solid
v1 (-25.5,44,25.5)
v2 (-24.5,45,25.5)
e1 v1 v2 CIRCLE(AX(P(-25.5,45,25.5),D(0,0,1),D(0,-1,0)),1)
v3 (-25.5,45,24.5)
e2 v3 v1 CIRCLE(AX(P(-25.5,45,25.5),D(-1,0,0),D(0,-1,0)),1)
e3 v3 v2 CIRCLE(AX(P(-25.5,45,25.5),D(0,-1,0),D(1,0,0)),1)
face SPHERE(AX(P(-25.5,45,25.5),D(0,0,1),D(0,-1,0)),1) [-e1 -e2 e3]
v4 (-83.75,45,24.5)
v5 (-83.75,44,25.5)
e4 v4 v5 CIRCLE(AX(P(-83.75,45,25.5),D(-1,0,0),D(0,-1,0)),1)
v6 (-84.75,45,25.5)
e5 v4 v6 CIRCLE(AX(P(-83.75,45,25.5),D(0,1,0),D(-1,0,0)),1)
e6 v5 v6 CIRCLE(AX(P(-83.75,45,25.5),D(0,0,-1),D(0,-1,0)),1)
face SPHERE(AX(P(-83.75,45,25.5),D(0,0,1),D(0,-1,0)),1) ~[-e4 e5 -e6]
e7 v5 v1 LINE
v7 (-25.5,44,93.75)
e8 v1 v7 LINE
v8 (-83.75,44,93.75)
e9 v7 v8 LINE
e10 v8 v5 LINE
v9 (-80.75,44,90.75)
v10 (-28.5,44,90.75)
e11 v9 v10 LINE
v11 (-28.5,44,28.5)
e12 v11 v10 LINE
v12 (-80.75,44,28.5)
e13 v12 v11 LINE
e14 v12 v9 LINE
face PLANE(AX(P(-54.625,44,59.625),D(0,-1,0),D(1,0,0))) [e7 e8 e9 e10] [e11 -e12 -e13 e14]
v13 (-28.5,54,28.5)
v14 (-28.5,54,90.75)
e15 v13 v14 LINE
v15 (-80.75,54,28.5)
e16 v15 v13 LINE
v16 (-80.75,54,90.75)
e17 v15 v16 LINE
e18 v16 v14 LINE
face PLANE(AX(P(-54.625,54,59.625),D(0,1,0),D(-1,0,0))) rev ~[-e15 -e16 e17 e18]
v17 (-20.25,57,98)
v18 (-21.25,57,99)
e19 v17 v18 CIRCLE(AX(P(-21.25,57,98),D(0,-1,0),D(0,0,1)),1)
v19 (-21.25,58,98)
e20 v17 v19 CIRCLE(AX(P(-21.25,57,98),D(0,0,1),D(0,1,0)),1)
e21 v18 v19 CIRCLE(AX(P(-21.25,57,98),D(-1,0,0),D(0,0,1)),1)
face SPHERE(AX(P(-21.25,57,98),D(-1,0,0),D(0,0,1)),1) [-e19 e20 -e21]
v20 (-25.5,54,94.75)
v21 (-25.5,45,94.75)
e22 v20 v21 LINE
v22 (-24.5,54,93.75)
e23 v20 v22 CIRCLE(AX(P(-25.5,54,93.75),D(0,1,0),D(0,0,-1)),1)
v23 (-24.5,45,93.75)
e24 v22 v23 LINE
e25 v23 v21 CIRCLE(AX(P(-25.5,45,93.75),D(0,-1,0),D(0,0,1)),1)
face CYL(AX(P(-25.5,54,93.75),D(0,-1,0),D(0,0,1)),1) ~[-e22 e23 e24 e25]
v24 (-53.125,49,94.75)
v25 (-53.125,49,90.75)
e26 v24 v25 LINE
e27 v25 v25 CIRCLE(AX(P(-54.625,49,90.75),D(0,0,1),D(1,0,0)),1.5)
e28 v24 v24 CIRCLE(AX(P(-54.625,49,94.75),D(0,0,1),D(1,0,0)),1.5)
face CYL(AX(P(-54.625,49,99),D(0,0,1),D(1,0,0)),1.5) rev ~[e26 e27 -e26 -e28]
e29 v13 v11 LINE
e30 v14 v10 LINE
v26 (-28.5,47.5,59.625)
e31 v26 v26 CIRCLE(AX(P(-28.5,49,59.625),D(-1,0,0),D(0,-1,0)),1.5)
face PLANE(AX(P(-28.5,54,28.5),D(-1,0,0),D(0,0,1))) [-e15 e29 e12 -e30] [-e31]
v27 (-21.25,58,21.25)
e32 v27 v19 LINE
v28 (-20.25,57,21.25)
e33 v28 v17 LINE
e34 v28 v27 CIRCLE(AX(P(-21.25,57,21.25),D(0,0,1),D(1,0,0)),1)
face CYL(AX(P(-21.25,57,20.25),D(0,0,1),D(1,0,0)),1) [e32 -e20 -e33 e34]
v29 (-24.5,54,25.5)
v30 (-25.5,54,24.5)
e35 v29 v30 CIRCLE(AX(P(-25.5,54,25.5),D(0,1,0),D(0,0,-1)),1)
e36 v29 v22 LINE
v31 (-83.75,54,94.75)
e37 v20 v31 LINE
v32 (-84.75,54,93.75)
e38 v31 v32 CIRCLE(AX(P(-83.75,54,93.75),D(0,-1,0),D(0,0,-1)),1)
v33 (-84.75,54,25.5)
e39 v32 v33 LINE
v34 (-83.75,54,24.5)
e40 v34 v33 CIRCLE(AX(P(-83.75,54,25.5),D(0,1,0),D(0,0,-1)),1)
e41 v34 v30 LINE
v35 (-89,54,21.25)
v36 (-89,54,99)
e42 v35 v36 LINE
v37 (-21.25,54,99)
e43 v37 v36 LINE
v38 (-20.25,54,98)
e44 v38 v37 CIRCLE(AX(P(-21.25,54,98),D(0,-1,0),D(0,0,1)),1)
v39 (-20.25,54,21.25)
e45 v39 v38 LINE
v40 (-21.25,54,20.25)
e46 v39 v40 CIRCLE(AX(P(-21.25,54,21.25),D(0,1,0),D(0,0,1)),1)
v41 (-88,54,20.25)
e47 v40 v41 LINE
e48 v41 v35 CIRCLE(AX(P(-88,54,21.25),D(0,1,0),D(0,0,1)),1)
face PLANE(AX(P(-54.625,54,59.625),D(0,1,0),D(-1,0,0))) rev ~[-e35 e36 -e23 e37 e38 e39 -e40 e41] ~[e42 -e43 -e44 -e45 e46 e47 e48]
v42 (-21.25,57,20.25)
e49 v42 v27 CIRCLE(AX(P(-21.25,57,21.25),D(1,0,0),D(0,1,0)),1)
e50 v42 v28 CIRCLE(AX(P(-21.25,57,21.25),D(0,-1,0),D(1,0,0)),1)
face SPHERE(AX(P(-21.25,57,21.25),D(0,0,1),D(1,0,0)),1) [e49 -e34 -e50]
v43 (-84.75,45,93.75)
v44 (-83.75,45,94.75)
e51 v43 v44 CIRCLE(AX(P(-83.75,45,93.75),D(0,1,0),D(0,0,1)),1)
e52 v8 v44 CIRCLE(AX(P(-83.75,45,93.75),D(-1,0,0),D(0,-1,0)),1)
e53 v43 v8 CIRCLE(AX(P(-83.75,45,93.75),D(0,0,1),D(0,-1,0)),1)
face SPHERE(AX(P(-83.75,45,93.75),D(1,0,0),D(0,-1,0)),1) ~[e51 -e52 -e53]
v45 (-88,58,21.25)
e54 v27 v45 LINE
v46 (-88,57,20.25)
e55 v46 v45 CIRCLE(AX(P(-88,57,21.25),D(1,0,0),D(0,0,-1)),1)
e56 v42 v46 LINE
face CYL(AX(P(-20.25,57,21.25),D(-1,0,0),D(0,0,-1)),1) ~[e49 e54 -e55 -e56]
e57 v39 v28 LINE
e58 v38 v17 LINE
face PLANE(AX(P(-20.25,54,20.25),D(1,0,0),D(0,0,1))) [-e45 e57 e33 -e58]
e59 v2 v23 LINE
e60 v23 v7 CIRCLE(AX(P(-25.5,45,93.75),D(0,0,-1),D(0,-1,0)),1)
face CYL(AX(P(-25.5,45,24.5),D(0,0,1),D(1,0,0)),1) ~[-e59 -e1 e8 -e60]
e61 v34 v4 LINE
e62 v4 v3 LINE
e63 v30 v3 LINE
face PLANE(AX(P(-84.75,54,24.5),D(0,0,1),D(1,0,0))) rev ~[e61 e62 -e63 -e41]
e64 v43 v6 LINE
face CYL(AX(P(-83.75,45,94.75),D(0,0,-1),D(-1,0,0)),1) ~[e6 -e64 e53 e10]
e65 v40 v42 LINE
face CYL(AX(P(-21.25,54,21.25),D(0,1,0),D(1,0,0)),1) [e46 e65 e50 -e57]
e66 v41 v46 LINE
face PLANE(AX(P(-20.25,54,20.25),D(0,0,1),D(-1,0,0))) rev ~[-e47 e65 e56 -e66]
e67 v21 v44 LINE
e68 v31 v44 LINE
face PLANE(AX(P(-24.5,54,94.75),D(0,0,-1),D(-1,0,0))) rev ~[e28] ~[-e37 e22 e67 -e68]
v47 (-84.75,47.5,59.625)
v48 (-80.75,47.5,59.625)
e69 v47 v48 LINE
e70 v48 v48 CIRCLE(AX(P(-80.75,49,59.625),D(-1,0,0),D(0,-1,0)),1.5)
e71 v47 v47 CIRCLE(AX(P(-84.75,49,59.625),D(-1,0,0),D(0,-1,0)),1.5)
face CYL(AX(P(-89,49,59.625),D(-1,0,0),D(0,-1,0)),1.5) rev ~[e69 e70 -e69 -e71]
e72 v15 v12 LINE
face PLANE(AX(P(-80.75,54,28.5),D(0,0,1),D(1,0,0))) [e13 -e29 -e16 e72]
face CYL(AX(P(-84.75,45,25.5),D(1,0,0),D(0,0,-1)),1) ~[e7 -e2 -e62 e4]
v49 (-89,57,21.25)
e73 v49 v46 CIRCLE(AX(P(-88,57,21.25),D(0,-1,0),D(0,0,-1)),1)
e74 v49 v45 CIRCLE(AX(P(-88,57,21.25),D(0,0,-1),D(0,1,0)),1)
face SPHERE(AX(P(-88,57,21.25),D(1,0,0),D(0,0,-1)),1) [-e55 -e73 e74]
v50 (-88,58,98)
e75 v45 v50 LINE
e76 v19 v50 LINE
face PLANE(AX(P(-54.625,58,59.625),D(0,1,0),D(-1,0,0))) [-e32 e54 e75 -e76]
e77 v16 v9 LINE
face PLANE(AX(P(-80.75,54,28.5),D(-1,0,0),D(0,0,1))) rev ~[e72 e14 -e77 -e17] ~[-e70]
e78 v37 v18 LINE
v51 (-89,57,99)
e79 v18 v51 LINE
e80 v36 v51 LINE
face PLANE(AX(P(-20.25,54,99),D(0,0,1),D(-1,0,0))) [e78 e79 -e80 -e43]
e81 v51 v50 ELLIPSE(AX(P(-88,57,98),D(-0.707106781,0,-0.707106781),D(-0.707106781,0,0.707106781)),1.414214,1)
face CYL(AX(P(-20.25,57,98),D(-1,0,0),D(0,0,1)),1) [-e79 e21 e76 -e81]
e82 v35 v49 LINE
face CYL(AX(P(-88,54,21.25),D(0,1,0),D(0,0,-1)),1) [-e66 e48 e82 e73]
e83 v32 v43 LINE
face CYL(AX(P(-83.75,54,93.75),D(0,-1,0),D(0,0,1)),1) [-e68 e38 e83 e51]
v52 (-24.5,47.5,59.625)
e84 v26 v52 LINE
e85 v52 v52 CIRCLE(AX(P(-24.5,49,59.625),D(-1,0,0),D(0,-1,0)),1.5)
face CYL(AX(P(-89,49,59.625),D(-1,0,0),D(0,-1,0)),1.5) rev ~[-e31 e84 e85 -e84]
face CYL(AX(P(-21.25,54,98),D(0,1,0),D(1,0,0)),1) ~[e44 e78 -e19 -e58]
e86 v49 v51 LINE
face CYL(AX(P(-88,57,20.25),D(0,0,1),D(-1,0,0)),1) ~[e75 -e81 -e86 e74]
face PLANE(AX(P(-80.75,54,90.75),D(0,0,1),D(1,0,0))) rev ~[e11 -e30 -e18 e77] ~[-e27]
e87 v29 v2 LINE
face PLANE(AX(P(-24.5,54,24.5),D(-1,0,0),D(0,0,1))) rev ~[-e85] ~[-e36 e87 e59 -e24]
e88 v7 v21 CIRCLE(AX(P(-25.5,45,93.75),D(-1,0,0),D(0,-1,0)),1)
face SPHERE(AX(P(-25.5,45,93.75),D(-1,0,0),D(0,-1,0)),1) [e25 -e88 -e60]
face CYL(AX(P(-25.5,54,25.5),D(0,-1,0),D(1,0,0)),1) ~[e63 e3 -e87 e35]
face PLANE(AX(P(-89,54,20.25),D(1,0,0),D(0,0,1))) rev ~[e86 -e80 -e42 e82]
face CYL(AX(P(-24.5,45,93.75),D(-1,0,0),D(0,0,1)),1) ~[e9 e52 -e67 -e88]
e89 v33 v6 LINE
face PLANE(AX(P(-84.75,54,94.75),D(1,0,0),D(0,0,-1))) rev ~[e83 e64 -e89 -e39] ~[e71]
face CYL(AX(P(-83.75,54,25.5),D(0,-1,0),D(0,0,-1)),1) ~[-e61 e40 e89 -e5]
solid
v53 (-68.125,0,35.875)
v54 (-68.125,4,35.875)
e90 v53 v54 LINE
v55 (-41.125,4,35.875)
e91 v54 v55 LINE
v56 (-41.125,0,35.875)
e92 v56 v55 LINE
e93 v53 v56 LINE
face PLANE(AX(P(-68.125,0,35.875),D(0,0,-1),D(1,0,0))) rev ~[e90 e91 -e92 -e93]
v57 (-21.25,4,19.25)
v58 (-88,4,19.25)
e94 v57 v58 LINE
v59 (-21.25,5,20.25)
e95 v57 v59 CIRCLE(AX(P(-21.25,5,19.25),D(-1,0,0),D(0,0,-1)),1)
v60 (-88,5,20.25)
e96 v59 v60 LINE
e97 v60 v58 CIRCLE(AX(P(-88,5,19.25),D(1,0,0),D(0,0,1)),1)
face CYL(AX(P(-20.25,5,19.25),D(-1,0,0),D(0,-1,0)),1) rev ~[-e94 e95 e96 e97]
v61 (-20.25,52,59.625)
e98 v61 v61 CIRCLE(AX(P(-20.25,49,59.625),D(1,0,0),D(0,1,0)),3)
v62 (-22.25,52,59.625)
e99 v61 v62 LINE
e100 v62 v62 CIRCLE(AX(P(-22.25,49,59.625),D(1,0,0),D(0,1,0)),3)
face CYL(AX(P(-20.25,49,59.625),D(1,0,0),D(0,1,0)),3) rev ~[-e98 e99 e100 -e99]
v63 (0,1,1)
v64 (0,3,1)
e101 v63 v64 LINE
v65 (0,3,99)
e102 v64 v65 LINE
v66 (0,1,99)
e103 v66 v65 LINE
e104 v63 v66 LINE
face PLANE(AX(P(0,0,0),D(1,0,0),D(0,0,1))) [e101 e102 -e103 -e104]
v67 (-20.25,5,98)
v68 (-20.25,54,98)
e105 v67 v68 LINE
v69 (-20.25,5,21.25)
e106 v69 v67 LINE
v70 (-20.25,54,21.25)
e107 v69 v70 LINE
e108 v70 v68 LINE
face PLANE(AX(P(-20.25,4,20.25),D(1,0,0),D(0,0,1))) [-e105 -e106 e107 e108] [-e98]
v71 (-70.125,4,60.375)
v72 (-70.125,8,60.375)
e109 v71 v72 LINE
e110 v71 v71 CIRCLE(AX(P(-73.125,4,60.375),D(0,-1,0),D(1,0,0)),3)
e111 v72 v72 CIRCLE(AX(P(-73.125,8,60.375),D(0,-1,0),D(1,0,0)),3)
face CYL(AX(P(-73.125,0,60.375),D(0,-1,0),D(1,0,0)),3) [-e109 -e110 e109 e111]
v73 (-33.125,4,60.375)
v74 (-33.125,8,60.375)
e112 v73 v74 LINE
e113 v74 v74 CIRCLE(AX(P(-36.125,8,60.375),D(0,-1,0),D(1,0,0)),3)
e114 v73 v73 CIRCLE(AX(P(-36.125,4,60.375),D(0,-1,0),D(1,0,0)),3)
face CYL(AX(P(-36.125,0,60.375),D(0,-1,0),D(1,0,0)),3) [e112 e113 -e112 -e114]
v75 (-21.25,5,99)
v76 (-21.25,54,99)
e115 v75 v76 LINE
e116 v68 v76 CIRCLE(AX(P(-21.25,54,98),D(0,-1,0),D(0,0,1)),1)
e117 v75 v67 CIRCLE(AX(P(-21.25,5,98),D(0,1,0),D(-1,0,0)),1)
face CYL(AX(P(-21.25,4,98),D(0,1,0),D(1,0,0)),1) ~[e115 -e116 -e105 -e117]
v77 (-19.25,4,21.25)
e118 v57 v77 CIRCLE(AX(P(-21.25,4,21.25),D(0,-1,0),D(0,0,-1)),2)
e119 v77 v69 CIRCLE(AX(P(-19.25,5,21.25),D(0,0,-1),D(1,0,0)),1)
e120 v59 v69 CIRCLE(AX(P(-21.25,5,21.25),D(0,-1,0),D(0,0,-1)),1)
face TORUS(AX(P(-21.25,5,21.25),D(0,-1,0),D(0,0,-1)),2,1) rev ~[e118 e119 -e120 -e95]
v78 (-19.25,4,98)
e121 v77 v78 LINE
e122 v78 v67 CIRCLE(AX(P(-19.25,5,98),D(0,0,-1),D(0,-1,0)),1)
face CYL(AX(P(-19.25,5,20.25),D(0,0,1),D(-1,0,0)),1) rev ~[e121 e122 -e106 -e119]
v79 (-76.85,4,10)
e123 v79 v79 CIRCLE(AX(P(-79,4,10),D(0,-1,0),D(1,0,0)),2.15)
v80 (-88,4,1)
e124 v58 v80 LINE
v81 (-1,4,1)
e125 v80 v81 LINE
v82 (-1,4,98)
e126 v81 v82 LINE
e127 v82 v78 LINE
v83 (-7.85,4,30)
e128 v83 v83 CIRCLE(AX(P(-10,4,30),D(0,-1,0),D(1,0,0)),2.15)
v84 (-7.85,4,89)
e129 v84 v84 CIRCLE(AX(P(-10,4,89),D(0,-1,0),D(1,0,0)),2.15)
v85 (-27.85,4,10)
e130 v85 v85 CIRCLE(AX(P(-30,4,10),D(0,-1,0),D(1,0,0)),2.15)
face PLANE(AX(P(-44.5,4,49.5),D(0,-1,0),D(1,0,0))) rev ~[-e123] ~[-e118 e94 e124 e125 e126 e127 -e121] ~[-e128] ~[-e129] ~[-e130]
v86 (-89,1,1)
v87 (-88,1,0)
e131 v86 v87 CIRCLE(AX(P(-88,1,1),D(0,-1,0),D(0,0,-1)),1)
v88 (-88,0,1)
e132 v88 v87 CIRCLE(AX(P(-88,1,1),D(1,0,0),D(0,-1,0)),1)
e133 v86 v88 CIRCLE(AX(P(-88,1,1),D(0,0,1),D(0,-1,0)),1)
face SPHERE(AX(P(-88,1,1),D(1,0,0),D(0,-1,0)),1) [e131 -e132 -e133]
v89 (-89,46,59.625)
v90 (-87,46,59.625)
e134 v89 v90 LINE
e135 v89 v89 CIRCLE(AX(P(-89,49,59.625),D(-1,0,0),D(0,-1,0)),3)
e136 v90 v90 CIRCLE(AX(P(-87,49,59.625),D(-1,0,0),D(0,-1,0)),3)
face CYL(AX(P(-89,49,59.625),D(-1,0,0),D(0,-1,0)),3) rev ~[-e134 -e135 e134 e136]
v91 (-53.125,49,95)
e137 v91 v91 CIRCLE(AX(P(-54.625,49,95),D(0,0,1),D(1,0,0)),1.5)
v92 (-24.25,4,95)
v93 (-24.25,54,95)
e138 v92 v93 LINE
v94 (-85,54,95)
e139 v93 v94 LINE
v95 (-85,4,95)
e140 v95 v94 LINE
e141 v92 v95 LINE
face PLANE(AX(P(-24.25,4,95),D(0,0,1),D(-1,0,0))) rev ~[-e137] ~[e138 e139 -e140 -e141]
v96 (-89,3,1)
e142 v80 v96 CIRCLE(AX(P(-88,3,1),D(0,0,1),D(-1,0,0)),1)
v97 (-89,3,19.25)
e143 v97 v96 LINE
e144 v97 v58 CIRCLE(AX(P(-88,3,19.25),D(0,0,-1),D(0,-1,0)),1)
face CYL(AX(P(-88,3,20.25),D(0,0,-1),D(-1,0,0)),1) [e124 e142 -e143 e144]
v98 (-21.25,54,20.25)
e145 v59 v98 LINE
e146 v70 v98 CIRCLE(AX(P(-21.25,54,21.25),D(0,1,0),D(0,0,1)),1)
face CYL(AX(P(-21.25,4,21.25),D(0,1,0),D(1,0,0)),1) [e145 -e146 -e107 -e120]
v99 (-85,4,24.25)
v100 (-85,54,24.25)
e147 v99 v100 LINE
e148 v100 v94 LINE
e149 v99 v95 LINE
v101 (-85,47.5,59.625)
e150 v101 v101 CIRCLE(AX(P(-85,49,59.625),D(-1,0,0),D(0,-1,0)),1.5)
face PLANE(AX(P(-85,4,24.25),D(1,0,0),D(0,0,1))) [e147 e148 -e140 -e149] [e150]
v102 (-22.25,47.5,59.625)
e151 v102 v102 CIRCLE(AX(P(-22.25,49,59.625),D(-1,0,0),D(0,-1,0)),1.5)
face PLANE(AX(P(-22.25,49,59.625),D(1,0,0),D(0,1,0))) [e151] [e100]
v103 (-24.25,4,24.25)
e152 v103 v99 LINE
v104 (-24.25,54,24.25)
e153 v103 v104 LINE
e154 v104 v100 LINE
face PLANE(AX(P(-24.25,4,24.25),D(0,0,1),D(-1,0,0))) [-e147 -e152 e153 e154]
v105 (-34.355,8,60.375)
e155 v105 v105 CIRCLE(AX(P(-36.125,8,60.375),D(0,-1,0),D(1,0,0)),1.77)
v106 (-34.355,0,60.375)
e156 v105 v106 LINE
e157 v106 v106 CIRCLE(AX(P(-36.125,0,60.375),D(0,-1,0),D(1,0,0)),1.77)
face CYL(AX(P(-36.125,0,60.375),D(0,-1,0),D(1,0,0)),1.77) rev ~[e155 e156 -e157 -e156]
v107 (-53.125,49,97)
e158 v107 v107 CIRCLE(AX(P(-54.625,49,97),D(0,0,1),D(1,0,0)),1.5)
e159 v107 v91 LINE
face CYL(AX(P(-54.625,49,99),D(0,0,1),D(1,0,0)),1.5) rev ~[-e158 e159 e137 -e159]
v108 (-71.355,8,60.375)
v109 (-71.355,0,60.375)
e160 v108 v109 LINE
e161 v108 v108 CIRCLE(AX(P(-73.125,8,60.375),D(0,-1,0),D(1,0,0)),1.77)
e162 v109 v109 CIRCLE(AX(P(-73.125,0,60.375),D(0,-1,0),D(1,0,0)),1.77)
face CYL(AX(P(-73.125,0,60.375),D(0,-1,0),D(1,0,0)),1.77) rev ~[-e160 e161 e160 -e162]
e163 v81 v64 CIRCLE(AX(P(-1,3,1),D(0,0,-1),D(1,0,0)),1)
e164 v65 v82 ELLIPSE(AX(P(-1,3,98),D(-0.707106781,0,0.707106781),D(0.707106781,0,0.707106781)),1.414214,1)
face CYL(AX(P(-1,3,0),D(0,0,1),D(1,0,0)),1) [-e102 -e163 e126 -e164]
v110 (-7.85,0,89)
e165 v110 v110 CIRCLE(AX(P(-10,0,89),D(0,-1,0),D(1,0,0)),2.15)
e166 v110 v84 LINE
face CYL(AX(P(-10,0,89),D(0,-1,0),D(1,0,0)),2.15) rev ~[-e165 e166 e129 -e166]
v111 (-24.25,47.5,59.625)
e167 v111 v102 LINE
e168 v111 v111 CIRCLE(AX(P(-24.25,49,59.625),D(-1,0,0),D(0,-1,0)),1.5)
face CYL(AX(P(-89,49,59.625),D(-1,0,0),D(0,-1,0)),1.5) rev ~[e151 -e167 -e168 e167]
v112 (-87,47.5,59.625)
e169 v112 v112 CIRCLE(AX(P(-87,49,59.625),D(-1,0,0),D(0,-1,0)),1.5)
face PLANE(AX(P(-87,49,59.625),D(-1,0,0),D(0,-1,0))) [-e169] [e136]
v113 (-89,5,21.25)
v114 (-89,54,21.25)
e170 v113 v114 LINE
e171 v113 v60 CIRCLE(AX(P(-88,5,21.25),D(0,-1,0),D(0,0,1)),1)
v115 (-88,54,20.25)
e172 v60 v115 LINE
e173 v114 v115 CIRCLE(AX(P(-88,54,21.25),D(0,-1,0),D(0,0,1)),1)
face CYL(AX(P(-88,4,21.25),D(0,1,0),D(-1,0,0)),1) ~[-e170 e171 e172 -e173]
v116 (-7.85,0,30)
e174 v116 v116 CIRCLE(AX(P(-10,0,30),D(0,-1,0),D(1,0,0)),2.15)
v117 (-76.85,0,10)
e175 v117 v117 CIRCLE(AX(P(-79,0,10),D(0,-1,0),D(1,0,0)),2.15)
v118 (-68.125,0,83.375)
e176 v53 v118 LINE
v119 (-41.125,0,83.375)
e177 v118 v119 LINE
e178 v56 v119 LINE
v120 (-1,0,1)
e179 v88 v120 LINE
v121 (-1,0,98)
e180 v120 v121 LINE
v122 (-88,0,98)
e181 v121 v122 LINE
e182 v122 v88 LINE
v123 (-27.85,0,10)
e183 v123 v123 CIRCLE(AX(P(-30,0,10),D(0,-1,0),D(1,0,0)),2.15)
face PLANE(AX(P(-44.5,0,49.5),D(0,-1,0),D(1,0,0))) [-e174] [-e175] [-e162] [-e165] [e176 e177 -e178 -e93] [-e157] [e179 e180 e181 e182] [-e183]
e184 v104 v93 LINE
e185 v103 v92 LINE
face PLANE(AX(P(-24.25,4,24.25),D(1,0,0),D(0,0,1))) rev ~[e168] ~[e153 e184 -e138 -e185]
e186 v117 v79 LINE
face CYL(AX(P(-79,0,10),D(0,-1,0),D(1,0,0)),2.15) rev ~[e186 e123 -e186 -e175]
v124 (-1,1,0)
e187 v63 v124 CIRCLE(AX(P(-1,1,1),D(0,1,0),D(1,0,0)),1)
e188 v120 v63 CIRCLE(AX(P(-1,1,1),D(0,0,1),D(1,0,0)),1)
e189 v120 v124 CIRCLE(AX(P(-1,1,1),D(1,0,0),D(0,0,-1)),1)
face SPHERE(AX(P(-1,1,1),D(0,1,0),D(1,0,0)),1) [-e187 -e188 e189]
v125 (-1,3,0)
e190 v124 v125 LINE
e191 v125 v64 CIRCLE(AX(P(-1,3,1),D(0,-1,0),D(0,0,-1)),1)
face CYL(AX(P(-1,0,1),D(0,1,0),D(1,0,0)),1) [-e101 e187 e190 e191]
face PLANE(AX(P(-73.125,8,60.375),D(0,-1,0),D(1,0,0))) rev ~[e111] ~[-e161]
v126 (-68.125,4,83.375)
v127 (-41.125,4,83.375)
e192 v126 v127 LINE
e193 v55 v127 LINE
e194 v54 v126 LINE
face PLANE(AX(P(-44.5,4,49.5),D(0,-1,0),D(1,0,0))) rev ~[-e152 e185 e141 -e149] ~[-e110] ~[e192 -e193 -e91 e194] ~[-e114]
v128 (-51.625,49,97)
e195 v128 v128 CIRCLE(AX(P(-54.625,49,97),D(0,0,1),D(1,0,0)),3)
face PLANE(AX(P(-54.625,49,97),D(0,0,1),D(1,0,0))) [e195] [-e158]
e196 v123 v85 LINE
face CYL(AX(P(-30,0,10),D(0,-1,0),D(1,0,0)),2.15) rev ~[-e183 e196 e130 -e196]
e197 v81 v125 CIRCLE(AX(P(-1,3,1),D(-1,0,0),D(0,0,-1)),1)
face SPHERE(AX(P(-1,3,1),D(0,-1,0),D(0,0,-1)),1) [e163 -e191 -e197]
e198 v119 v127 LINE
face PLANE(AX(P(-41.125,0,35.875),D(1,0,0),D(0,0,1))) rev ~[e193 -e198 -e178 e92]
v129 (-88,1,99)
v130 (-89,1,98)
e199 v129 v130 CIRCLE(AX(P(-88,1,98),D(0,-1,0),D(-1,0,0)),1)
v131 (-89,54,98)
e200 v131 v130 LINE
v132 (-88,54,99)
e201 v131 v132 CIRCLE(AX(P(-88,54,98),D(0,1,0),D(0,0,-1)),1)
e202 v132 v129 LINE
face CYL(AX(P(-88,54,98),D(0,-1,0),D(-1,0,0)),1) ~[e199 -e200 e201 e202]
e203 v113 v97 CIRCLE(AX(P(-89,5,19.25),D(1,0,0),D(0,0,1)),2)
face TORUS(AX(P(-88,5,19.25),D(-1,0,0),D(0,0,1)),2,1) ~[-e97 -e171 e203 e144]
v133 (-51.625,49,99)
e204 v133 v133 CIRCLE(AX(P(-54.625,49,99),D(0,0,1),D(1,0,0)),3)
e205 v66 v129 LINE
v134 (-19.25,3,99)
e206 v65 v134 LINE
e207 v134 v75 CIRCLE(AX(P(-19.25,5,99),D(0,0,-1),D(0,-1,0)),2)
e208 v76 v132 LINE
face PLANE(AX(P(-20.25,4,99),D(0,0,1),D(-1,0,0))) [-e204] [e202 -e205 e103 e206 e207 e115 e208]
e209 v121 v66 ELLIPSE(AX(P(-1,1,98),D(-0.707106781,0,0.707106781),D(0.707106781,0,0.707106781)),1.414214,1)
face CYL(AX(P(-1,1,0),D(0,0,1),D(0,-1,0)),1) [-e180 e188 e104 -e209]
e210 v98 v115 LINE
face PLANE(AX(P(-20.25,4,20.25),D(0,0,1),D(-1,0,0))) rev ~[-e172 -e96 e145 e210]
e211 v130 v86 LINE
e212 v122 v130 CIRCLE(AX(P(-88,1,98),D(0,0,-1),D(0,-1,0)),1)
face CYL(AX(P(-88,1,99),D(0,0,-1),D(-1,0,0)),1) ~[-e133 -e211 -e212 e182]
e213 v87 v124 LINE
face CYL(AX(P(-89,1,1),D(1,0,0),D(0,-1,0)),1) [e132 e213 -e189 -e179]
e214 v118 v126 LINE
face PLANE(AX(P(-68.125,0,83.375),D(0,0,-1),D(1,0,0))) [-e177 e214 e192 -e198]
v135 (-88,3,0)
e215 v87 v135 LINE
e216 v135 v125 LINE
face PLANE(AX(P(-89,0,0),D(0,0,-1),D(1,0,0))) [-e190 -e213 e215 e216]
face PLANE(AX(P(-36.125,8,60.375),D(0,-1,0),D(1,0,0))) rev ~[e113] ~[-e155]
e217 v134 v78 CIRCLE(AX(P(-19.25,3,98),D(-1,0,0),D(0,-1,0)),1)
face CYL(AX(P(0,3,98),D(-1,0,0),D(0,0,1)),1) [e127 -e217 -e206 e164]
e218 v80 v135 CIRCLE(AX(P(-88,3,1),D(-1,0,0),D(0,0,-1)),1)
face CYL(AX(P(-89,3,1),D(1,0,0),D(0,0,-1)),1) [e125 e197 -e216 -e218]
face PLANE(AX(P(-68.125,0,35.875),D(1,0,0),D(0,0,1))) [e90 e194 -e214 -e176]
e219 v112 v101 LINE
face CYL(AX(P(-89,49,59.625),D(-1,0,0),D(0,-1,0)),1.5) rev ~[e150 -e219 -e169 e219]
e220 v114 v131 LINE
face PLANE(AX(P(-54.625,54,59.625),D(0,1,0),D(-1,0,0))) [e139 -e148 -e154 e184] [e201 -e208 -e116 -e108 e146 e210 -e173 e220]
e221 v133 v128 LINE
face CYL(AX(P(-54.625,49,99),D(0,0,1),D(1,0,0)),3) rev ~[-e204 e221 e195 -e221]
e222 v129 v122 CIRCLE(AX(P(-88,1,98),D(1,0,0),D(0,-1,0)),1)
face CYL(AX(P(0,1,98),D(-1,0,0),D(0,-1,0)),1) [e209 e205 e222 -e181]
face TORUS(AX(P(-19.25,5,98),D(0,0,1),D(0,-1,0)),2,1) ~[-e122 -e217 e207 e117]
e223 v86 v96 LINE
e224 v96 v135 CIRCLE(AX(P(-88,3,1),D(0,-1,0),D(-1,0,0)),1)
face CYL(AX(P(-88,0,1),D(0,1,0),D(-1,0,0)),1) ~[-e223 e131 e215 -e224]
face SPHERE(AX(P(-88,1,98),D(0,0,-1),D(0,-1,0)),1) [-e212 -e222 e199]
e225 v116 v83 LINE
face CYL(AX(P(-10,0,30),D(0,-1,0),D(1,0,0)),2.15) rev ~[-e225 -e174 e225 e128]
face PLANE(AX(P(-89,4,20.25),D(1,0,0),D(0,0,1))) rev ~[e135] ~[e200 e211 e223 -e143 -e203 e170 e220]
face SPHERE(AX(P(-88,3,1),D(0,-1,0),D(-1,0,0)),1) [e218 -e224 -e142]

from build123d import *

# Parameters (mm, degrees)
F0_R      = 2.15
F0_R_2    = 3
F0_W      = 27
F0_H      = 47.5
F0_R_3    = 1.77
F1_DEPTH  = 4
F2_DEPTH  = 8
F3_W      = 68.75
F3_H      = 78.75
F3_W_2    = 60.75
F3_H_2    = 70.75
F4_DEPTH  = 50
F5_W      = 68.75
F5_H      = 78.75
F6_DEPTH  = 4
F7_W      = 52.25
F7_H      = 62.25
F8_DEPTH  = 10
F9_R      = 1
F10_R     = 1.5
F11_DEPTH = 25
F10_R_2   = 3
F12_DEPTH = 2
F13_R     = 1.5
F14_DEPTH = 89.001
F13_R_2   = 3
F15_DEPTH = 2
F16_R     = 3
F16_R_2   = 1.5
F17_DEPTH = 2
F18_R     = 1
F18_2_R   = 1


with BuildPart() as f1:
    # F0 (on Front) → F1 (new body)
    with BuildSketch(Plane.XZ):
        Polygon((-89, 0), (0, 0), (0, 99), (-20.25, 99), (-89, 99), align=None)
        with Locations((-79, 10)):
            Circle(F0_R, mode=Mode.SUBTRACT)
        with Locations((-30, 10)):
            Circle(F0_R, mode=Mode.SUBTRACT)
        with Locations((-10, 30)):
            Circle(F0_R, mode=Mode.SUBTRACT)
        with Locations((-73.125, 60.375)):
            Circle(F0_R_2, mode=Mode.SUBTRACT)
        with Locations((-54.625, 59.625)):
            Rectangle(F0_W, F0_H, mode=Mode.SUBTRACT)
        with Locations((-36.125, 60.375)):
            Circle(F0_R_2, mode=Mode.SUBTRACT)
        with Locations((-10, 89)):
            Circle(F0_R, mode=Mode.SUBTRACT)
        with Locations((-73.125, 60.375)):
            Circle(F0_R_2)
        with Locations((-73.125, 60.375)):
            Circle(F0_R_3, mode=Mode.SUBTRACT)
        with Locations((-36.125, 60.375)):
            Circle(F0_R_2)
        with Locations((-36.125, 60.375)):
            Circle(F0_R_3, mode=Mode.SUBTRACT)
    extrude(amount=-F1_DEPTH)

    # F0 (on Front) → F2 (join)
    with BuildSketch(Plane.XZ):
        with Locations((-73.125, 60.375)):
            Circle(F0_R_2)
        with Locations((-73.125, 60.375)):
            Circle(F0_R_3, mode=Mode.SUBTRACT)
        with Locations((-36.125, 60.375)):
            Circle(F0_R_2)
        with Locations((-36.125, 60.375)):
            Circle(F0_R_3, mode=Mode.SUBTRACT)
    extrude(amount=-F2_DEPTH)

    # F3 (on face) → F4 (join)
    with BuildSketch(Plane(origin=(0, 4, 0), x_dir=(-1, 0, 0), z_dir=(0, 1, 0))):
        with Locations((54.625, 59.625)):
            Rectangle(F3_W, F3_H)
        with Locations((54.625, 59.625)):
            Rectangle(F3_W_2, F3_H_2, mode=Mode.SUBTRACT)
    extrude(amount=F4_DEPTH)


with BuildPart() as f6:
    # F5 (on face) → F6 (new body)
    with BuildSketch(Plane(origin=(0, 54, 0), x_dir=(-1, 0, 0), z_dir=(0, 1, 0))):
        with Locations((54.625, 59.625)):
            Rectangle(F5_W, F5_H)
    extrude(amount=F6_DEPTH)

    # F7 (on face) → F8 (join)
    with BuildSketch(Plane.XZ.offset(-54)):
        Polygon((-80.75, 94.75), (-84.75, 94.75), (-84.75, 24.5), (-80.75, 24.5), (-28.5, 24.5), (-24.5, 24.5), (-24.5, 94.75), (-28.5, 94.75), align=None)
        with Locations((-54.625, 59.625)):
            Rectangle(F7_W, F7_H, mode=Mode.SUBTRACT)
    extrude(amount=F8_DEPTH)

    # F9
    f9_edges = [f6.edges().sort_by_distance(p)[0] for p in [
        (-54.625, 44, 94.75),
        (-84.75, 44, 59.625),
        (-24.5, 44, 59.625),
        (-54.625, 44, 24.5),
        (-84.75, 49, 94.75),
        (-84.75, 49, 24.5),
        (-24.5, 49, 24.5),
        (-24.5, 49, 94.75),
    ]]
    fillet(f9_edges, radius=F9_R)


with BuildPart() as f11_tool:
    # F10 (on face) → F11 (new body)
    with BuildSketch(Plane.XY.offset(99)):
        with Locations((-54.625, 49)):
            Circle(F10_R)
    extrude(amount=-F11_DEPTH)


with BuildPart() as f1_1:
    add(f1.part)

    # F11: cut by f11_tool
    add(f11_tool.part, mode=Mode.SUBTRACT)

    # F10 (on face) → F12 (cut)
    with BuildSketch(Plane.XY.offset(99)):
        with Locations((-54.625, 49)):
            Circle(F10_R_2)
        with Locations((-54.625, 49)):
            Circle(F10_R, mode=Mode.SUBTRACT)
    extrude(amount=-F12_DEPTH, mode=Mode.SUBTRACT)


with BuildPart() as f6_1:
    add(f6.part)

    # F11: cut by f11_tool
    add(f11_tool.part, mode=Mode.SUBTRACT)


with BuildPart() as f14_tool:
    # F13 (on face) → F14 (new body, through all)
    with BuildSketch(Plane(origin=(-89, 0, 0), x_dir=(0, -1, 0), z_dir=(-1, 0, 0))):
        with Locations((-49, 59.625)):
            Circle(F13_R)
    extrude(amount=-F14_DEPTH)


with BuildPart() as f1_2:
    add(f1_1.part)

    # F14: cut by f14_tool
    add(f14_tool.part, mode=Mode.SUBTRACT)

    # F13 (on face) → F15 (cut)
    with BuildSketch(Plane(origin=(-89, 0, 0), x_dir=(0, -1, 0), z_dir=(-1, 0, 0))):
        with Locations((-49, 59.625)):
            Circle(F13_R_2)
        with Locations((-49, 59.625)):
            Circle(F13_R, mode=Mode.SUBTRACT)
    extrude(amount=-F15_DEPTH, mode=Mode.SUBTRACT)

    # F16 (on face) → F17 (cut)
    with BuildSketch(Plane.YZ.offset(-20.25)):
        with Locations((49, 59.625)):
            Circle(F16_R)
        with Locations((49, 59.625)):
            Circle(F16_R_2, mode=Mode.SUBTRACT)
    extrude(amount=-F17_DEPTH, mode=Mode.SUBTRACT)

    # F18
    f18_edges = [f1_2.edges().sort_by_distance(p)[0] for p in [
        (0, 2, 0),
        (0, 0, 49.5),
        (-44.5, 0, 0),
        (-89, 0, 49.5),
        (-44.5, 0, 99),
        (-89, 2, 0),
        (-89, 4, 10.125),
        (-89, 27, 99),
        (-20.25, 4, 59.625),
        (-20.25, 29, 20.25),
        (-44.5, 4, 0),
        (0, 4, 49.5),
        (-10.125, 4, 99),
        (-54.625, 4, 20.25),
        (-20.25, 29, 99),
        (-89, 29, 20.25),
    ]]
    fillet(f18_edges, radius=F18_R)


with BuildPart() as f6_2:
    add(f6_1.part)

    # F14: cut by f14_tool
    add(f14_tool.part, mode=Mode.SUBTRACT)

    # F18#2
    f18_2_edges = [f6_2.edges().sort_by_distance(p)[0] for p in [
        (-54.625, 58, 99),
        (-20.25, 56, 99),
        (-20.25, 58, 59.625),
        (-20.25, 56, 20.25),
        (-54.625, 58, 20.25),
        (-89, 56, 20.25),
        (-89, 58, 59.625),
    ]]
    fillet(f18_2_edges, radius=F18_2_R)


solid = Compound([f1_2.part, f6_2.part])
